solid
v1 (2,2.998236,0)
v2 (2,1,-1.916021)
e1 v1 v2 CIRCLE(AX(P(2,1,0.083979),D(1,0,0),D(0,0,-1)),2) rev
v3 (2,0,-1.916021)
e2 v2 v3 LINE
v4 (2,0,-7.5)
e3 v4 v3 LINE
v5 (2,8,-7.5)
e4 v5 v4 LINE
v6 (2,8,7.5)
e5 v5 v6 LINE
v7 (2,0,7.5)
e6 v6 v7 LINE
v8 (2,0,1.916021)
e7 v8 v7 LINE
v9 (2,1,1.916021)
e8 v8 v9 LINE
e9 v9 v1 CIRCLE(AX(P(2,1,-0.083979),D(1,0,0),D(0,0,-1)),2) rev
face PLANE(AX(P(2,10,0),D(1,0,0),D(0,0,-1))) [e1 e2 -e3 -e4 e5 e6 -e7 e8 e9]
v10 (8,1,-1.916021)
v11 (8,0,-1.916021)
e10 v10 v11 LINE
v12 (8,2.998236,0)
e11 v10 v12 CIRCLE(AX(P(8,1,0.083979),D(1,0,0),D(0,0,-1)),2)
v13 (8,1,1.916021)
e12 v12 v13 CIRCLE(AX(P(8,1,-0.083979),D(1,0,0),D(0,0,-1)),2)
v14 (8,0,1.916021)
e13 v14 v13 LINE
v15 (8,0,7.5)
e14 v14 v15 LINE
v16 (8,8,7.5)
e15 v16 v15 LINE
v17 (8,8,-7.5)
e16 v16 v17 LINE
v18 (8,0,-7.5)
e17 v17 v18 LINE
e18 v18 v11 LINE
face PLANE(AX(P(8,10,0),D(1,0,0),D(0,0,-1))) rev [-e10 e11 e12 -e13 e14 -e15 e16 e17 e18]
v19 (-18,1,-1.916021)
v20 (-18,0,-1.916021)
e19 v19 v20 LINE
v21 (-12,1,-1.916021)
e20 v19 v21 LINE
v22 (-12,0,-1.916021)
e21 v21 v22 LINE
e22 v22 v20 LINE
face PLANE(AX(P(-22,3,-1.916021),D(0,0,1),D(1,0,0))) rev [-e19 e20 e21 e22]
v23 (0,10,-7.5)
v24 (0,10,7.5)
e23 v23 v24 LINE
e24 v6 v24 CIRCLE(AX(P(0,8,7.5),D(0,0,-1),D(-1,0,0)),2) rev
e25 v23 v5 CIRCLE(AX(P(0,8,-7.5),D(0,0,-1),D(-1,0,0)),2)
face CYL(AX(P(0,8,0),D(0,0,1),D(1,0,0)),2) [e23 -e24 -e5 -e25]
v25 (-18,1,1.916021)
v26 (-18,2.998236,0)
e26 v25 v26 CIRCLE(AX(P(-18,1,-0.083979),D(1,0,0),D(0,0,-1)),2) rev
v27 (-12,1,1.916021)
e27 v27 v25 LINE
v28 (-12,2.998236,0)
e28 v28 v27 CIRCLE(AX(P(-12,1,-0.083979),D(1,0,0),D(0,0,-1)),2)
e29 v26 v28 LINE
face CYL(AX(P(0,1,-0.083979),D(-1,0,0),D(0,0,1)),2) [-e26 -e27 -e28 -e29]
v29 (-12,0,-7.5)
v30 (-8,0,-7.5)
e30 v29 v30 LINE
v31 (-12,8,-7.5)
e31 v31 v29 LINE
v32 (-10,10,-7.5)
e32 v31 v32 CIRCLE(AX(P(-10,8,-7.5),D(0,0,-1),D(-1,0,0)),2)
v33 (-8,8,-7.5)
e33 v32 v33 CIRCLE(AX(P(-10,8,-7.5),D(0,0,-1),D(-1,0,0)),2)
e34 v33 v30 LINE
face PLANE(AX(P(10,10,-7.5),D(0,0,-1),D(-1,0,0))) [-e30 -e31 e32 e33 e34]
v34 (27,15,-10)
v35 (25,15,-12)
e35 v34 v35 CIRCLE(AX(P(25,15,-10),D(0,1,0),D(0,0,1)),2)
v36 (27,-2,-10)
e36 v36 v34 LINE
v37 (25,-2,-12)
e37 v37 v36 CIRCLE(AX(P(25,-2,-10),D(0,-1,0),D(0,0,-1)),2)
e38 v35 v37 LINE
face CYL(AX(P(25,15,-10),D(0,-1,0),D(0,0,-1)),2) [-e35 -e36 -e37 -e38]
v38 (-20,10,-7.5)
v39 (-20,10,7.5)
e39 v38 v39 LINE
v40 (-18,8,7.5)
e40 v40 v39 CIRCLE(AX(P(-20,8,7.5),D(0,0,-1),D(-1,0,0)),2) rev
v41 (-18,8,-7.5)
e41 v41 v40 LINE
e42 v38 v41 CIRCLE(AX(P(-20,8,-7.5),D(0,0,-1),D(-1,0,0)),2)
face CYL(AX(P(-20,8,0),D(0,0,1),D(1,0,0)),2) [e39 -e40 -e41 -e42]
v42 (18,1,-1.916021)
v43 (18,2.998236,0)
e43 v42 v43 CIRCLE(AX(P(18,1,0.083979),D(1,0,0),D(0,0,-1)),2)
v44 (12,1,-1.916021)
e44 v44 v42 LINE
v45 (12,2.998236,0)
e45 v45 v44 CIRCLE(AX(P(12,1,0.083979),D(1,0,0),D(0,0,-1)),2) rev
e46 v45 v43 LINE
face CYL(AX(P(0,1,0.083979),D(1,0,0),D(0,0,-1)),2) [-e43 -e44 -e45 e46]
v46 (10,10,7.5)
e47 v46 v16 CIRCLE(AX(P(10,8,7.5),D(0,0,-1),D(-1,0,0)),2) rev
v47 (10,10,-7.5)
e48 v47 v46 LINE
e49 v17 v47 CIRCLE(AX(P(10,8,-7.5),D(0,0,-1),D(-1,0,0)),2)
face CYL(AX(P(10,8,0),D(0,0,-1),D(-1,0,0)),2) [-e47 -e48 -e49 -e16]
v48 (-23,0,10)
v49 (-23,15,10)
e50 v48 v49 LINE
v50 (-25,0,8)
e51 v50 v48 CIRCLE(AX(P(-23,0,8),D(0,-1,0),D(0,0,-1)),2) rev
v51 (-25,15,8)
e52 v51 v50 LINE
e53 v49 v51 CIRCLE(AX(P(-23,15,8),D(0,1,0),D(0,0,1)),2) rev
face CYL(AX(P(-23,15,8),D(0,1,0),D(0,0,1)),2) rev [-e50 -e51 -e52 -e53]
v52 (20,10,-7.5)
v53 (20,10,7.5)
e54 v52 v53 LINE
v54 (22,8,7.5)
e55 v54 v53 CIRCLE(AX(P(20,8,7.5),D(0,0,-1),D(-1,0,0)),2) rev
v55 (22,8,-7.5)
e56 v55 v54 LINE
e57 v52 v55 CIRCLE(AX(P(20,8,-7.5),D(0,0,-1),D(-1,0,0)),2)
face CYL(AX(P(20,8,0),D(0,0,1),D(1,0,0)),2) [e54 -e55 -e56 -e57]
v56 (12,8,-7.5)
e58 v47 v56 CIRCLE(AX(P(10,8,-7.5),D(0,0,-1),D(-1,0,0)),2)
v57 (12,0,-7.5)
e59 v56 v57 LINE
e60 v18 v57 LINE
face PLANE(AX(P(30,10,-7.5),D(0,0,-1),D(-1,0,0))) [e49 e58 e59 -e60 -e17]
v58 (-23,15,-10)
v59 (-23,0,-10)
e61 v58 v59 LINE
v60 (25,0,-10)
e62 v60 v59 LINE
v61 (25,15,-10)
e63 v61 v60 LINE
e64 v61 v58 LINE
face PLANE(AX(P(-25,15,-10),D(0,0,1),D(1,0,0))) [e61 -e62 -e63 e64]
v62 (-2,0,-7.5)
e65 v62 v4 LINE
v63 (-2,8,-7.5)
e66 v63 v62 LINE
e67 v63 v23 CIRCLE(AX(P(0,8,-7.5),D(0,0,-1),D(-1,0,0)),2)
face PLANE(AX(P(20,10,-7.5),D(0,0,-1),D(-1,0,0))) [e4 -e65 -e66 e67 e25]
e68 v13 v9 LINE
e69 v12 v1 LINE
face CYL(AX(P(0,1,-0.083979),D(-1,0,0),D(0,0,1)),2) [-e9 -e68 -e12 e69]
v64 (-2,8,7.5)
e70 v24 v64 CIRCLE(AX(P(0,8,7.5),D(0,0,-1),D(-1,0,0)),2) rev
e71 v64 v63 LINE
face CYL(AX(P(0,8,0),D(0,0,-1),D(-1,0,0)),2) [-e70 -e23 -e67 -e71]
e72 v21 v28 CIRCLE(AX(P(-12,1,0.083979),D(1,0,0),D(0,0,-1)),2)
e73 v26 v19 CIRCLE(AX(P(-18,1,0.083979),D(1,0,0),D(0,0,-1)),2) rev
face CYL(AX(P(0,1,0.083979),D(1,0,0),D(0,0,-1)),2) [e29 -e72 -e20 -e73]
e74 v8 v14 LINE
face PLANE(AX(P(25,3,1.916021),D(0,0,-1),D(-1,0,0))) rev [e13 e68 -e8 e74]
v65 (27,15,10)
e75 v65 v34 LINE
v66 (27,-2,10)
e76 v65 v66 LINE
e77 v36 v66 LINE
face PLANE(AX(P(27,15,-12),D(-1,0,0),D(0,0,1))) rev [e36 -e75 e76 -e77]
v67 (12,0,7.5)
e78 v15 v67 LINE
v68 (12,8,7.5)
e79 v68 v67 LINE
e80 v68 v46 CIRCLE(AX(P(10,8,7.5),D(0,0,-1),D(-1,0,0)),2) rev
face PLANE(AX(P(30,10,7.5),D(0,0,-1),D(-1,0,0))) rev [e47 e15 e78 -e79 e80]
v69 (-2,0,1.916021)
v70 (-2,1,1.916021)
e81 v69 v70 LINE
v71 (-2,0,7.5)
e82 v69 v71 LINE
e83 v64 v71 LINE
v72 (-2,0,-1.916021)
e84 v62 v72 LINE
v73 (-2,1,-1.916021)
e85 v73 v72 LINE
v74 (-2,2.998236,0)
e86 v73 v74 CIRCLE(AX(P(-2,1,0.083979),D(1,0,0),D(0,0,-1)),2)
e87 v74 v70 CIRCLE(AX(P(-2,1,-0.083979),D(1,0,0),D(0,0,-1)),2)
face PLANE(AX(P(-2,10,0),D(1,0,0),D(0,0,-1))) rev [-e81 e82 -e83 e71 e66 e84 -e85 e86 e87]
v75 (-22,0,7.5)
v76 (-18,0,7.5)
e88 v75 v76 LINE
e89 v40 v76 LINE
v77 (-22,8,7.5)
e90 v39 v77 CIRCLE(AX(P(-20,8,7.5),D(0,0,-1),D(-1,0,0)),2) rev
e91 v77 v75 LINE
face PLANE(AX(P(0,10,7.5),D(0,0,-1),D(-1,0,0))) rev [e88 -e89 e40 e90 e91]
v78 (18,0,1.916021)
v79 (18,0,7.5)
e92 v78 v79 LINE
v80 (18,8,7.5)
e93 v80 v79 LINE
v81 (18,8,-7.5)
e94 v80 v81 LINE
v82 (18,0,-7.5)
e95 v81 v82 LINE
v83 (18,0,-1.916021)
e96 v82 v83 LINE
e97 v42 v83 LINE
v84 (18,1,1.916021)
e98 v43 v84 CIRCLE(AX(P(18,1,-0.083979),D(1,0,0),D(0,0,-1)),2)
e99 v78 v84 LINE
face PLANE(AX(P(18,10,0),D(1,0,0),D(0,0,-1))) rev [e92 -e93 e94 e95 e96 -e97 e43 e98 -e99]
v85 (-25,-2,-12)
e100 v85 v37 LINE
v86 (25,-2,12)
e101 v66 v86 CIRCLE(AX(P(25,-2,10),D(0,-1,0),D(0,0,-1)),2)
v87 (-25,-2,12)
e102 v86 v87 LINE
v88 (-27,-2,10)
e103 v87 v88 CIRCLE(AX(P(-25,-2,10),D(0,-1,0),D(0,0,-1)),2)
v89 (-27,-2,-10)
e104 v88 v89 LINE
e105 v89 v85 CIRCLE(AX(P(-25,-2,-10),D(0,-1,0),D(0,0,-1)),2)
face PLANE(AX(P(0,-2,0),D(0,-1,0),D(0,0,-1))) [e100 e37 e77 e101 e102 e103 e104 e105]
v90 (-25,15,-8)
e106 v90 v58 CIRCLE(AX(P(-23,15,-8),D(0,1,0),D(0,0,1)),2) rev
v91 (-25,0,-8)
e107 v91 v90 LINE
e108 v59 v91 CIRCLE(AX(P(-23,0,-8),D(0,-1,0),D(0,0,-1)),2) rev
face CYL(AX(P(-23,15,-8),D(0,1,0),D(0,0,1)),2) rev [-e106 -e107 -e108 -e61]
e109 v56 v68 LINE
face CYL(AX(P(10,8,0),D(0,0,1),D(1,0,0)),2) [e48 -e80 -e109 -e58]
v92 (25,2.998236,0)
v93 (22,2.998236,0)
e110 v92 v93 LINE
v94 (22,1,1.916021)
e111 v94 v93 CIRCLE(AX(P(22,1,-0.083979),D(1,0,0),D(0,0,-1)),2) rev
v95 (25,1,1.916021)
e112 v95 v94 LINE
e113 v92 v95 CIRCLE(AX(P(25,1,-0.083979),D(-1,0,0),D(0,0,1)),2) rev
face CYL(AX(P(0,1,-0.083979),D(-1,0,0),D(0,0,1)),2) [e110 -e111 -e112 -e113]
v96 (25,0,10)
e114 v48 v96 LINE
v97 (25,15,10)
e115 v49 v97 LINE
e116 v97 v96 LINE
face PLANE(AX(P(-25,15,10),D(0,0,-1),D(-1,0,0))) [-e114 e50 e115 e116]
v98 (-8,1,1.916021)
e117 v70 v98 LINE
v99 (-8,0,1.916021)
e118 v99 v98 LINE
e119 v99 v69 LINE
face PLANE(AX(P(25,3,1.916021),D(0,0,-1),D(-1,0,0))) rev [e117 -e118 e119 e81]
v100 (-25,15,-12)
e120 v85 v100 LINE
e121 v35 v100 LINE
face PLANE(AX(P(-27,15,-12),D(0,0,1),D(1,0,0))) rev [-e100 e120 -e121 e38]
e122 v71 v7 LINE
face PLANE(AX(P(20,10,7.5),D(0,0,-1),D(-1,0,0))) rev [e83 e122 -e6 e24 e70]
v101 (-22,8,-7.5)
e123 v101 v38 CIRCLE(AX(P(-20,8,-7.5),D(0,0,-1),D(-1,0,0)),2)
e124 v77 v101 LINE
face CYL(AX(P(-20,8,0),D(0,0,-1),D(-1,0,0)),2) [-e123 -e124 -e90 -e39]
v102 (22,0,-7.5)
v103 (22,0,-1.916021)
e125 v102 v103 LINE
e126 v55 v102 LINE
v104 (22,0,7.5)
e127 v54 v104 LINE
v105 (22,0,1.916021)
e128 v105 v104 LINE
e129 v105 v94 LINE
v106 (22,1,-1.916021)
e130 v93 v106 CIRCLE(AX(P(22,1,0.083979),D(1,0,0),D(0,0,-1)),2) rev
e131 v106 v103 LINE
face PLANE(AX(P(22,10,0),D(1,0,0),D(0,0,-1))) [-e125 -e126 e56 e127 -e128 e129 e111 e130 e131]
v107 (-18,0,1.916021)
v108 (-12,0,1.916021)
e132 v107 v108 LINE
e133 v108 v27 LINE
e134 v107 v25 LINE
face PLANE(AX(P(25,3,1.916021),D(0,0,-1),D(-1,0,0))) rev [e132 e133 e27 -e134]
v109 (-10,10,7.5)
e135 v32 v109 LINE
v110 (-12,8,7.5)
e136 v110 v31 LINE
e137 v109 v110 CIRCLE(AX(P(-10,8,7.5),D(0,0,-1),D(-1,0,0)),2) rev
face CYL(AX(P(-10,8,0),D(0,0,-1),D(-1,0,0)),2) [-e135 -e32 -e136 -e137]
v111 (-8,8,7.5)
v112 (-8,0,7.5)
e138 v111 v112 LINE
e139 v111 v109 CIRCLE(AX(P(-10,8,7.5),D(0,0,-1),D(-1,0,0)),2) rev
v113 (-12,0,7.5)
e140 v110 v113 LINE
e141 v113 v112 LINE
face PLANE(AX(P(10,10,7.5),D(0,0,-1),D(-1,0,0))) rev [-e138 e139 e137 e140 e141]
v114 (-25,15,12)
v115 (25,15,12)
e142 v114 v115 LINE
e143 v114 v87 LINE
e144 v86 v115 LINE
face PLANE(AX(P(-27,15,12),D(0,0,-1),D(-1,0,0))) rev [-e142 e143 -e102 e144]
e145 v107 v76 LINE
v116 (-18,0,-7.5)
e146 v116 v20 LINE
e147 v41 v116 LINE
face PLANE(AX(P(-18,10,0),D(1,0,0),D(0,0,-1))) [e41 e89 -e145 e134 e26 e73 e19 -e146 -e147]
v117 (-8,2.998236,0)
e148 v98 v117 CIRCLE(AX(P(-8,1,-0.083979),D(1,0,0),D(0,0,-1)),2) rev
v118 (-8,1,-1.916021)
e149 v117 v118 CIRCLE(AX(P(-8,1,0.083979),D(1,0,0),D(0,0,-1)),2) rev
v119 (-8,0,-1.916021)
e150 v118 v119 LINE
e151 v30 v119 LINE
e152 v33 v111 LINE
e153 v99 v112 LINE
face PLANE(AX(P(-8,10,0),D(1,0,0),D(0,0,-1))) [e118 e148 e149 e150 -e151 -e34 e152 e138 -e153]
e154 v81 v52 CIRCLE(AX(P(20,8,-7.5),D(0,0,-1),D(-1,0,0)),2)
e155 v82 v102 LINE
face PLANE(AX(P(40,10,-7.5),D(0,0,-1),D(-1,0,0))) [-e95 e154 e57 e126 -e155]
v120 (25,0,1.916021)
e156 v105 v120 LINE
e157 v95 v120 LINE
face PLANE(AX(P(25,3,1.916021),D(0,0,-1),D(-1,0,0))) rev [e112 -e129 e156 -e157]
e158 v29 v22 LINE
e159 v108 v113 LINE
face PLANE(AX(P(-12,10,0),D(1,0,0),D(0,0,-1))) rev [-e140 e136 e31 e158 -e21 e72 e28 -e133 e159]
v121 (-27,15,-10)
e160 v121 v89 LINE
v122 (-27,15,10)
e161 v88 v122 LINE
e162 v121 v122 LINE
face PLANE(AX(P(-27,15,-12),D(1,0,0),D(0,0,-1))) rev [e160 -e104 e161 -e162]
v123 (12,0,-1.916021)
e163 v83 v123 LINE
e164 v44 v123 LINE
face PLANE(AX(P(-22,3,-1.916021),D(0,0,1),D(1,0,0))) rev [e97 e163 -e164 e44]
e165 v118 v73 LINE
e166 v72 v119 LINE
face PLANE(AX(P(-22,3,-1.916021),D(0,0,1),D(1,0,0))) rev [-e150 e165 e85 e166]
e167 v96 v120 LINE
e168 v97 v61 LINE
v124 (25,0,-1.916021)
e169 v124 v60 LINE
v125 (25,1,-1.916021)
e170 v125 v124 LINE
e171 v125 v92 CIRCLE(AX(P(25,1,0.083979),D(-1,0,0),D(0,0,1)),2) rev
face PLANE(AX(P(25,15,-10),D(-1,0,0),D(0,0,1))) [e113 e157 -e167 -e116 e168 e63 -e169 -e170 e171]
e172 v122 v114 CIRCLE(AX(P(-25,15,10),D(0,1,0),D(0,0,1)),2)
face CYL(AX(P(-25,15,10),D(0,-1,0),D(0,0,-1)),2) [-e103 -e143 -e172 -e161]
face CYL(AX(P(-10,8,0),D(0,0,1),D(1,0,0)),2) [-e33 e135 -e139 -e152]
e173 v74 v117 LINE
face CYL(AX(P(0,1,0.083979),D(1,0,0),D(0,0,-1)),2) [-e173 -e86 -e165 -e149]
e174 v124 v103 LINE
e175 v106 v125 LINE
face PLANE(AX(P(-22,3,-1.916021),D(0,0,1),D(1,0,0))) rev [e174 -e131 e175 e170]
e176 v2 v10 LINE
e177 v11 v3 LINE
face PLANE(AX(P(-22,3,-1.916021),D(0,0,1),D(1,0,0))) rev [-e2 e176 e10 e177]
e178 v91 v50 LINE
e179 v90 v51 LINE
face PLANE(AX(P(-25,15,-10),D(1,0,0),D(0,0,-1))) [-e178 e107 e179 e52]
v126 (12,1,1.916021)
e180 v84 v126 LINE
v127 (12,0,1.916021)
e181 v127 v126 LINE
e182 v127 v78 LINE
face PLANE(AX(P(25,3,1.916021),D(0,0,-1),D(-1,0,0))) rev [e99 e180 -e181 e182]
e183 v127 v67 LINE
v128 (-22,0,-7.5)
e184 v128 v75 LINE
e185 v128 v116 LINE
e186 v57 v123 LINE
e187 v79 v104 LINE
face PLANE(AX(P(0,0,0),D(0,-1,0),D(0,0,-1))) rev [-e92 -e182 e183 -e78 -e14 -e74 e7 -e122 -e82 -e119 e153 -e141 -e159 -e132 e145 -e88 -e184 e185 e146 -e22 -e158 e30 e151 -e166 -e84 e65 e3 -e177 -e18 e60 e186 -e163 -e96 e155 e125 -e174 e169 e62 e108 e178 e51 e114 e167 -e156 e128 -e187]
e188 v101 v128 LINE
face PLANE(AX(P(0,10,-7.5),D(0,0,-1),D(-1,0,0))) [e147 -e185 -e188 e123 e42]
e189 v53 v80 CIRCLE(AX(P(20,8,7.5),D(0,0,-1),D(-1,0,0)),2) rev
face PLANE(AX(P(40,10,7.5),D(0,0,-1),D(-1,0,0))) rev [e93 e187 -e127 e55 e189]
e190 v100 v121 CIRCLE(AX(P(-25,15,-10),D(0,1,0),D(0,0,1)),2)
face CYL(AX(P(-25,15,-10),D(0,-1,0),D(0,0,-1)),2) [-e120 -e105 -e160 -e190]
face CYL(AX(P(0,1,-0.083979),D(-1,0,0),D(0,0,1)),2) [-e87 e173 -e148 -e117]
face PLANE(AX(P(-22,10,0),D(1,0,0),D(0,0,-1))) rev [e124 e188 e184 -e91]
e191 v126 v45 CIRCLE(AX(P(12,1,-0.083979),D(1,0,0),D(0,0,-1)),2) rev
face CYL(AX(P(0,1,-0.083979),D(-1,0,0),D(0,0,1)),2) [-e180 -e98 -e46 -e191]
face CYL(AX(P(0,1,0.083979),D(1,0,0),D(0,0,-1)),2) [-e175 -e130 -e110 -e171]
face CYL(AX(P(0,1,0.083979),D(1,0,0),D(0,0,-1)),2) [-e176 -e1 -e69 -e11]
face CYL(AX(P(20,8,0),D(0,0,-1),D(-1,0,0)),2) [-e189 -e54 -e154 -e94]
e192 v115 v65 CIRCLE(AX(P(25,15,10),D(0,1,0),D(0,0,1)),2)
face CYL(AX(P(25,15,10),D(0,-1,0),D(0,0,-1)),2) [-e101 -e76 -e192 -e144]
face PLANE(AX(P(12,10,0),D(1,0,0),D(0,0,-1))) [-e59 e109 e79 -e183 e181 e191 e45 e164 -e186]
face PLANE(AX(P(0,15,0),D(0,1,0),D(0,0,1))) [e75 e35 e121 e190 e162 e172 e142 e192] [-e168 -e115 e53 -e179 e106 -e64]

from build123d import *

# Parameters (mm, degrees)
CROQUIS7_W               = 54
CROQUIS7_H               = 24
CROQUIS7_W_2             = 50
CROQUIS7_H_2             = 20
SALIENTE_EXTRUIR7_DEPTH  = 15
CROQUIS8_W               = 54
CROQUIS8_H               = 24
SALIENTE_EXTRUIR8_DEPTH  = 2
CROQUIS9_W               = 4
CROQUIS9_H               = 15
SALIENTE_EXTRUIR10_DEPTH = 10
MATRIZL1_COUNT           = 5
MATRIZL1_PITCH           = 10
CROQUIS10_W              = 47
CROQUIS10_H              = 3.83204255
SALIENTE_EXTRUIR11_DEPTH = 3
REDONDEO1_R              = 2
REDONDEO2_R              = 2
REDONDEO3_R              = 2
REDONDEO4_R              = 2


# Some blends are built 0.0001 mm under size
with BuildPart() as part:
    # Croquis7 → Saliente-Extruir7 (new body)
    with BuildSketch(Plane(origin=(0, 0, 0), x_dir=(1, 0, 0), z_dir=(0, 1, 0))):
        Rectangle(CROQUIS7_W, CROQUIS7_H)
        Rectangle(CROQUIS7_W_2, CROQUIS7_H_2, mode=Mode.SUBTRACT)
    extrude(amount=SALIENTE_EXTRUIR7_DEPTH)

    # Croquis8 → Saliente-Extruir8 (add)
    with BuildSketch(Plane.XZ):
        Rectangle(CROQUIS8_W, CROQUIS8_H)
    extrude(amount=SALIENTE_EXTRUIR8_DEPTH)

    # Croquis9 → Saliente-Extruir10 (add)
    with BuildSketch(Plane(origin=(0, 0, 0), x_dir=(1, 0, 0), z_dir=(0, 1, 0))):
        with Locations((-20, 0)):
            Rectangle(CROQUIS9_W, CROQUIS9_H)
    saliente_extruir10 = extrude(amount=SALIENTE_EXTRUIR10_DEPTH)

    # MatrizL1: Saliente-Extruir10 ×5
    with Locations(*[(i * MATRIZL1_PITCH, 0, 0) for i in range(1, MATRIZL1_COUNT)]):
        add(saliente_extruir10)

    # Croquis10 → Saliente-Extruir11 (add)
    with BuildSketch(Plane(origin=(0, 0, 0), x_dir=(1, 0, 0), z_dir=(0, 1, 0))):
        with Locations((1.5, 0)):
            Rectangle(CROQUIS10_W, CROQUIS10_H)
    extrude(amount=SALIENTE_EXTRUIR11_DEPTH)

    # Redondeo1
    # the kernel refuses this fillet: 2 mm, written as the material it takes off along each edge
    with BuildSketch(Plane(origin=(25, 3, 1.916021275), x_dir=(0, 0, -1), z_dir=(-1, 0, 0))) as redondeo1_piece_1:
        with BuildLine():
            CenterArc((REDONDEO1_R, REDONDEO1_R), REDONDEO1_R, 180, 90)
            Line((0, REDONDEO1_R), (0, 0))
            Line((0, 0), (REDONDEO1_R, 0))
        make_face()
    extrude(amount=3, mode=Mode.SUBTRACT)
    with BuildSketch(Plane(origin=(30, 3, 1.916021275), x_dir=(0, 0, -1), z_dir=(-1, 0, 0))) as redondeo1_piece_2_section:
        with BuildLine():
            CenterArc((REDONDEO1_R, REDONDEO1_R), REDONDEO1_R, 180, 90)
            Line((0, REDONDEO1_R), (0, 0))
            Line((0, 0), (REDONDEO1_R, 0))
        make_face()
    redondeo1_piece_2 = extrude(amount=13, mode=Mode.PRIVATE)
    redondeo1_piece_2 = split(redondeo1_piece_2, bisect_by=Plane(origin=(18, 2.553264122, 1.469285397), z_dir=(-1, 0, 0)), keep=Keep.TOP, mode=Mode.PRIVATE)
    add(redondeo1_piece_2, mode=Mode.SUBTRACT)
    with BuildSketch(Plane(origin=(17, 3, -1.916021275), x_dir=(0, -1, 0), z_dir=(1, 0, 0))) as redondeo1_piece_3_section:
        with BuildLine():
            CenterArc((REDONDEO1_R, -REDONDEO1_R), REDONDEO1_R, 90, 90)
            Line((0, -REDONDEO1_R), (0, 0))
            Line((0, 0), (REDONDEO1_R, 0))
        make_face()
    redondeo1_piece_3 = extrude(amount=13, mode=Mode.PRIVATE)
    redondeo1_piece_3 = split(redondeo1_piece_3, bisect_by=Plane(origin=(18, 2.553264122, -1.469285397), z_dir=(-1, 0, 0)), keep=Keep.TOP, mode=Mode.PRIVATE)
    add(redondeo1_piece_3, mode=Mode.SUBTRACT)
    with BuildSketch(Plane(origin=(22, 3, -1.916021275), x_dir=(0, -1, 0), z_dir=(1, 0, 0))) as redondeo1_piece_4:
        with BuildLine():
            CenterArc((REDONDEO1_R, -REDONDEO1_R), REDONDEO1_R, 90, 90)
            Line((0, -REDONDEO1_R), (0, 0))
            Line((0, 0), (REDONDEO1_R, 0))
        make_face()
    extrude(amount=3, mode=Mode.SUBTRACT)
    with BuildSketch(Plane(origin=(7, 3, -1.916021275), x_dir=(0, -1, 0), z_dir=(1, 0, 0))) as redondeo1_piece_5_section:
        with BuildLine():
            CenterArc((REDONDEO1_R, -REDONDEO1_R), REDONDEO1_R, 90, 90)
            Line((0, -REDONDEO1_R), (0, 0))
            Line((0, 0), (REDONDEO1_R, 0))
        make_face()
    redondeo1_piece_5 = extrude(amount=16, mode=Mode.PRIVATE)
    redondeo1_piece_5 = split(redondeo1_piece_5, bisect_by=Plane(origin=(8, 2.553264122, -1.469285397), z_dir=(-1, 0, 0)), keep=Keep.TOP, mode=Mode.PRIVATE)
    add(redondeo1_piece_5, mode=Mode.SUBTRACT)
    with BuildSketch(Plane(origin=(12, 3, -1.916021275), x_dir=(0, -1, 0), z_dir=(1, 0, 0)), Plane(origin=(2, 3, -1.916021275), x_dir=(0, -1, 0), z_dir=(1, 0, 0)), Plane(origin=(-8, 3, -1.916021275), x_dir=(0, -1, 0), z_dir=(1, 0, 0)), Plane(origin=(-18, 3, -1.916021275), x_dir=(0, -1, 0), z_dir=(1, 0, 0))) as redondeo1_piece_6:
        with BuildLine():
            CenterArc((REDONDEO1_R, -REDONDEO1_R), REDONDEO1_R, 90, 90)
            Line((0, -REDONDEO1_R), (0, 0))
            Line((0, 0), (REDONDEO1_R, 0))
        make_face()
    extrude(amount=6, mode=Mode.SUBTRACT)
    with BuildSketch(Plane(origin=(7, 3, -1.916021275), x_dir=(0, -1, 0), z_dir=(1, 0, 0))) as redondeo1_piece_7_section:
        with BuildLine():
            CenterArc((REDONDEO1_R, -REDONDEO1_R), REDONDEO1_R, 90, 90)
            Line((0, -REDONDEO1_R), (0, 0))
            Line((0, 0), (REDONDEO1_R, 0))
        make_face()
    redondeo1_piece_7 = extrude(amount=16, mode=Mode.PRIVATE)
    redondeo1_piece_7 = split(redondeo1_piece_7, bisect_by=Plane(origin=(22, 2.553264122, -1.469285397), z_dir=(1, 0, 0)), keep=Keep.TOP, mode=Mode.PRIVATE)
    add(redondeo1_piece_7, mode=Mode.SUBTRACT)
    with BuildSketch(Plane(origin=(23, 3, 1.916021275), x_dir=(0, 0, -1), z_dir=(-1, 0, 0))) as redondeo1_piece_8_section:
        with BuildLine():
            CenterArc((REDONDEO1_R, REDONDEO1_R), REDONDEO1_R, 180, 90)
            Line((0, REDONDEO1_R), (0, 0))
            Line((0, 0), (REDONDEO1_R, 0))
        make_face()
    redondeo1_piece_8 = extrude(amount=16, mode=Mode.PRIVATE)
    redondeo1_piece_8 = split(redondeo1_piece_8, bisect_by=Plane(origin=(22, 2.553264122, 1.469285397), z_dir=(1, 0, 0)), keep=Keep.TOP, mode=Mode.PRIVATE)
    add(redondeo1_piece_8, mode=Mode.SUBTRACT)
    with BuildSketch(Plane(origin=(18, 3, 1.916021275), x_dir=(0, 0, -1), z_dir=(-1, 0, 0)), Plane(origin=(8, 3, 1.916021275), x_dir=(0, 0, -1), z_dir=(-1, 0, 0)), Plane(origin=(-2, 3, 1.916021275), x_dir=(0, 0, -1), z_dir=(-1, 0, 0)), Plane(origin=(-12, 3, 1.916021275), x_dir=(0, 0, -1), z_dir=(-1, 0, 0))) as redondeo1_piece_9:
        with BuildLine():
            CenterArc((REDONDEO1_R, REDONDEO1_R), REDONDEO1_R, 180, 90)
            Line((0, REDONDEO1_R), (0, 0))
            Line((0, 0), (REDONDEO1_R, 0))
        make_face()
    extrude(amount=6, mode=Mode.SUBTRACT)
    with BuildSketch(Plane(origin=(23, 3, 1.916021275), x_dir=(0, 0, -1), z_dir=(-1, 0, 0))) as redondeo1_piece_10_section:
        with BuildLine():
            CenterArc((REDONDEO1_R, REDONDEO1_R), REDONDEO1_R, 180, 90)
            Line((0, REDONDEO1_R), (0, 0))
            Line((0, 0), (REDONDEO1_R, 0))
        make_face()
    redondeo1_piece_10 = extrude(amount=16, mode=Mode.PRIVATE)
    redondeo1_piece_10 = split(redondeo1_piece_10, bisect_by=Plane(origin=(8, 2.553264122, 1.469285397), z_dir=(-1, 0, 0)), keep=Keep.TOP, mode=Mode.PRIVATE)
    add(redondeo1_piece_10, mode=Mode.SUBTRACT)
    with BuildSketch(Plane(origin=(13, 3, 1.916021275), x_dir=(0, 0, -1), z_dir=(-1, 0, 0))) as redondeo1_piece_11_section:
        with BuildLine():
            CenterArc((REDONDEO1_R, REDONDEO1_R), REDONDEO1_R, 180, 90)
            Line((0, REDONDEO1_R), (0, 0))
            Line((0, 0), (REDONDEO1_R, 0))
        make_face()
    redondeo1_piece_11 = extrude(amount=16, mode=Mode.PRIVATE)
    redondeo1_piece_11 = split(redondeo1_piece_11, bisect_by=Plane(origin=(12, 2.553264122, 1.469285397), z_dir=(1, 0, 0)), keep=Keep.TOP, mode=Mode.PRIVATE)
    add(redondeo1_piece_11, mode=Mode.SUBTRACT)
    with BuildSketch(Plane(origin=(13, 3, 1.916021275), x_dir=(0, 0, -1), z_dir=(-1, 0, 0))) as redondeo1_piece_12_section:
        with BuildLine():
            CenterArc((REDONDEO1_R, REDONDEO1_R), REDONDEO1_R, 180, 90)
            Line((0, REDONDEO1_R), (0, 0))
            Line((0, 0), (REDONDEO1_R, 0))
        make_face()
    redondeo1_piece_12 = extrude(amount=16, mode=Mode.PRIVATE)
    redondeo1_piece_12 = split(redondeo1_piece_12, bisect_by=Plane(origin=(-2, 2.553264122, 1.469285397), z_dir=(-1, 0, 0)), keep=Keep.TOP, mode=Mode.PRIVATE)
    add(redondeo1_piece_12, mode=Mode.SUBTRACT)
    with BuildSketch(Plane(origin=(-3, 3, -1.916021275), x_dir=(0, -1, 0), z_dir=(1, 0, 0))) as redondeo1_piece_13_section:
        with BuildLine():
            CenterArc((REDONDEO1_R, -REDONDEO1_R), REDONDEO1_R, 90, 90)
            Line((0, -REDONDEO1_R), (0, 0))
            Line((0, 0), (REDONDEO1_R, 0))
        make_face()
    redondeo1_piece_13 = extrude(amount=16, mode=Mode.PRIVATE)
    redondeo1_piece_13 = split(redondeo1_piece_13, bisect_by=Plane(origin=(-2, 2.553264122, -1.469285397), z_dir=(-1, 0, 0)), keep=Keep.TOP, mode=Mode.PRIVATE)
    add(redondeo1_piece_13, mode=Mode.SUBTRACT)
    with BuildSketch(Plane(origin=(-3, 3, -1.916021275), x_dir=(0, -1, 0), z_dir=(1, 0, 0))) as redondeo1_piece_14_section:
        with BuildLine():
            CenterArc((REDONDEO1_R, -REDONDEO1_R), REDONDEO1_R, 90, 90)
            Line((0, -REDONDEO1_R), (0, 0))
            Line((0, 0), (REDONDEO1_R, 0))
        make_face()
    redondeo1_piece_14 = extrude(amount=16, mode=Mode.PRIVATE)
    redondeo1_piece_14 = split(redondeo1_piece_14, bisect_by=Plane(origin=(12, 2.553264122, -1.469285397), z_dir=(1, 0, 0)), keep=Keep.TOP, mode=Mode.PRIVATE)
    add(redondeo1_piece_14, mode=Mode.SUBTRACT)
    with BuildSketch(Plane(origin=(3, 3, 1.916021275), x_dir=(0, 0, -1), z_dir=(-1, 0, 0))) as redondeo1_piece_15_section:
        with BuildLine():
            CenterArc((REDONDEO1_R, REDONDEO1_R), REDONDEO1_R, 180, 90)
            Line((0, REDONDEO1_R), (0, 0))
            Line((0, 0), (REDONDEO1_R, 0))
        make_face()
    redondeo1_piece_15 = extrude(amount=16, mode=Mode.PRIVATE)
    redondeo1_piece_15 = split(redondeo1_piece_15, bisect_by=Plane(origin=(2, 2.553264122, 1.469285397), z_dir=(1, 0, 0)), keep=Keep.TOP, mode=Mode.PRIVATE)
    add(redondeo1_piece_15, mode=Mode.SUBTRACT)
    with BuildSketch(Plane(origin=(3, 3, 1.916021275), x_dir=(0, 0, -1), z_dir=(-1, 0, 0))) as redondeo1_piece_16_section:
        with BuildLine():
            CenterArc((REDONDEO1_R, REDONDEO1_R), REDONDEO1_R, 180, 90)
            Line((0, REDONDEO1_R), (0, 0))
            Line((0, 0), (REDONDEO1_R, 0))
        make_face()
    redondeo1_piece_16 = extrude(amount=16, mode=Mode.PRIVATE)
    redondeo1_piece_16 = split(redondeo1_piece_16, bisect_by=Plane(origin=(-12, 2.553264122, 1.469285397), z_dir=(-1, 0, 0)), keep=Keep.TOP, mode=Mode.PRIVATE)
    add(redondeo1_piece_16, mode=Mode.SUBTRACT)
    with BuildSketch(Plane(origin=(-13, 3, -1.916021275), x_dir=(0, -1, 0), z_dir=(1, 0, 0))) as redondeo1_piece_17_section:
        with BuildLine():
            CenterArc((REDONDEO1_R, -REDONDEO1_R), REDONDEO1_R, 90, 90)
            Line((0, -REDONDEO1_R), (0, 0))
            Line((0, 0), (REDONDEO1_R, 0))
        make_face()
    redondeo1_piece_17 = extrude(amount=16, mode=Mode.PRIVATE)
    redondeo1_piece_17 = split(redondeo1_piece_17, bisect_by=Plane(origin=(-12, 2.553264122, -1.469285397), z_dir=(-1, 0, 0)), keep=Keep.TOP, mode=Mode.PRIVATE)
    add(redondeo1_piece_17, mode=Mode.SUBTRACT)
    with BuildSketch(Plane(origin=(-13, 3, -1.916021275), x_dir=(0, -1, 0), z_dir=(1, 0, 0))) as redondeo1_piece_18_section:
        with BuildLine():
            CenterArc((REDONDEO1_R, -REDONDEO1_R), REDONDEO1_R, 90, 90)
            Line((0, -REDONDEO1_R), (0, 0))
            Line((0, 0), (REDONDEO1_R, 0))
        make_face()
    redondeo1_piece_18 = extrude(amount=16, mode=Mode.PRIVATE)
    redondeo1_piece_18 = split(redondeo1_piece_18, bisect_by=Plane(origin=(2, 2.553264122, -1.469285397), z_dir=(1, 0, 0)), keep=Keep.TOP, mode=Mode.PRIVATE)
    add(redondeo1_piece_18, mode=Mode.SUBTRACT)
    with BuildSketch(Plane(origin=(-23, 3, -1.916021275), x_dir=(0, -1, 0), z_dir=(1, 0, 0))) as redondeo1_piece_19_section:
        with BuildLine():
            CenterArc((REDONDEO1_R, -REDONDEO1_R), REDONDEO1_R, 90, 90)
            Line((0, -REDONDEO1_R), (0, 0))
            Line((0, 0), (REDONDEO1_R, 0))
        make_face()
    redondeo1_piece_19 = extrude(amount=16, mode=Mode.PRIVATE)
    redondeo1_piece_19 = split(redondeo1_piece_19, bisect_by=Plane(origin=(-8, 2.553264122, -1.469285397), z_dir=(1, 0, 0)), keep=Keep.TOP, mode=Mode.PRIVATE)
    add(redondeo1_piece_19, mode=Mode.SUBTRACT)
    with BuildSketch(Plane(origin=(-7, 3, 1.916021275), x_dir=(0, 0, -1), z_dir=(-1, 0, 0))) as redondeo1_piece_20_section:
        with BuildLine():
            CenterArc((REDONDEO1_R, REDONDEO1_R), REDONDEO1_R, 180, 90)
            Line((0, REDONDEO1_R), (0, 0))
            Line((0, 0), (REDONDEO1_R, 0))
        make_face()
    redondeo1_piece_20 = extrude(amount=16, mode=Mode.PRIVATE)
    redondeo1_piece_20 = split(redondeo1_piece_20, bisect_by=Plane(origin=(-8, 2.553264122, 1.469285397), z_dir=(1, 0, 0)), keep=Keep.TOP, mode=Mode.PRIVATE)
    add(redondeo1_piece_20, mode=Mode.SUBTRACT)

    # Redondeo2
    redondeo2_edges = [part.edges().sort_by_distance(p)[0] for p in [
        (-25, 7.5, -10),
        (-25, 7.5, 10),
    ]]
    fillet(redondeo2_edges, radius=REDONDEO2_R)

    # Redondeo3
    redondeo3_edges = [part.edges().sort_by_distance(p)[0] for p in [
        (22, 10, 0),
        (18, 10, 0),
        (12, 10, 0),
        (8, 10, 0),
        (2, 10, 0),
        (-18, 10, 0),
        (-22, 10, 0),
        (-12, 10, 0),
        (-2, 10, 0),
        (-8, 10, 0),
    ]]
    fillet(redondeo3_edges, radius=REDONDEO3_R - 0.0001)  # a hair under: the kernel refuses the full size

    # Redondeo4
    redondeo4_edges = [part.edges().sort_by_distance(p)[0] for p in [
        (27, 6.5, 12),
        (-27, 6.5, 12),
        (-27, 6.5, -12),
        (27, 6.5, -12),
    ]]
    fillet(redondeo4_edges, radius=REDONDEO4_R)


solid = part.part
